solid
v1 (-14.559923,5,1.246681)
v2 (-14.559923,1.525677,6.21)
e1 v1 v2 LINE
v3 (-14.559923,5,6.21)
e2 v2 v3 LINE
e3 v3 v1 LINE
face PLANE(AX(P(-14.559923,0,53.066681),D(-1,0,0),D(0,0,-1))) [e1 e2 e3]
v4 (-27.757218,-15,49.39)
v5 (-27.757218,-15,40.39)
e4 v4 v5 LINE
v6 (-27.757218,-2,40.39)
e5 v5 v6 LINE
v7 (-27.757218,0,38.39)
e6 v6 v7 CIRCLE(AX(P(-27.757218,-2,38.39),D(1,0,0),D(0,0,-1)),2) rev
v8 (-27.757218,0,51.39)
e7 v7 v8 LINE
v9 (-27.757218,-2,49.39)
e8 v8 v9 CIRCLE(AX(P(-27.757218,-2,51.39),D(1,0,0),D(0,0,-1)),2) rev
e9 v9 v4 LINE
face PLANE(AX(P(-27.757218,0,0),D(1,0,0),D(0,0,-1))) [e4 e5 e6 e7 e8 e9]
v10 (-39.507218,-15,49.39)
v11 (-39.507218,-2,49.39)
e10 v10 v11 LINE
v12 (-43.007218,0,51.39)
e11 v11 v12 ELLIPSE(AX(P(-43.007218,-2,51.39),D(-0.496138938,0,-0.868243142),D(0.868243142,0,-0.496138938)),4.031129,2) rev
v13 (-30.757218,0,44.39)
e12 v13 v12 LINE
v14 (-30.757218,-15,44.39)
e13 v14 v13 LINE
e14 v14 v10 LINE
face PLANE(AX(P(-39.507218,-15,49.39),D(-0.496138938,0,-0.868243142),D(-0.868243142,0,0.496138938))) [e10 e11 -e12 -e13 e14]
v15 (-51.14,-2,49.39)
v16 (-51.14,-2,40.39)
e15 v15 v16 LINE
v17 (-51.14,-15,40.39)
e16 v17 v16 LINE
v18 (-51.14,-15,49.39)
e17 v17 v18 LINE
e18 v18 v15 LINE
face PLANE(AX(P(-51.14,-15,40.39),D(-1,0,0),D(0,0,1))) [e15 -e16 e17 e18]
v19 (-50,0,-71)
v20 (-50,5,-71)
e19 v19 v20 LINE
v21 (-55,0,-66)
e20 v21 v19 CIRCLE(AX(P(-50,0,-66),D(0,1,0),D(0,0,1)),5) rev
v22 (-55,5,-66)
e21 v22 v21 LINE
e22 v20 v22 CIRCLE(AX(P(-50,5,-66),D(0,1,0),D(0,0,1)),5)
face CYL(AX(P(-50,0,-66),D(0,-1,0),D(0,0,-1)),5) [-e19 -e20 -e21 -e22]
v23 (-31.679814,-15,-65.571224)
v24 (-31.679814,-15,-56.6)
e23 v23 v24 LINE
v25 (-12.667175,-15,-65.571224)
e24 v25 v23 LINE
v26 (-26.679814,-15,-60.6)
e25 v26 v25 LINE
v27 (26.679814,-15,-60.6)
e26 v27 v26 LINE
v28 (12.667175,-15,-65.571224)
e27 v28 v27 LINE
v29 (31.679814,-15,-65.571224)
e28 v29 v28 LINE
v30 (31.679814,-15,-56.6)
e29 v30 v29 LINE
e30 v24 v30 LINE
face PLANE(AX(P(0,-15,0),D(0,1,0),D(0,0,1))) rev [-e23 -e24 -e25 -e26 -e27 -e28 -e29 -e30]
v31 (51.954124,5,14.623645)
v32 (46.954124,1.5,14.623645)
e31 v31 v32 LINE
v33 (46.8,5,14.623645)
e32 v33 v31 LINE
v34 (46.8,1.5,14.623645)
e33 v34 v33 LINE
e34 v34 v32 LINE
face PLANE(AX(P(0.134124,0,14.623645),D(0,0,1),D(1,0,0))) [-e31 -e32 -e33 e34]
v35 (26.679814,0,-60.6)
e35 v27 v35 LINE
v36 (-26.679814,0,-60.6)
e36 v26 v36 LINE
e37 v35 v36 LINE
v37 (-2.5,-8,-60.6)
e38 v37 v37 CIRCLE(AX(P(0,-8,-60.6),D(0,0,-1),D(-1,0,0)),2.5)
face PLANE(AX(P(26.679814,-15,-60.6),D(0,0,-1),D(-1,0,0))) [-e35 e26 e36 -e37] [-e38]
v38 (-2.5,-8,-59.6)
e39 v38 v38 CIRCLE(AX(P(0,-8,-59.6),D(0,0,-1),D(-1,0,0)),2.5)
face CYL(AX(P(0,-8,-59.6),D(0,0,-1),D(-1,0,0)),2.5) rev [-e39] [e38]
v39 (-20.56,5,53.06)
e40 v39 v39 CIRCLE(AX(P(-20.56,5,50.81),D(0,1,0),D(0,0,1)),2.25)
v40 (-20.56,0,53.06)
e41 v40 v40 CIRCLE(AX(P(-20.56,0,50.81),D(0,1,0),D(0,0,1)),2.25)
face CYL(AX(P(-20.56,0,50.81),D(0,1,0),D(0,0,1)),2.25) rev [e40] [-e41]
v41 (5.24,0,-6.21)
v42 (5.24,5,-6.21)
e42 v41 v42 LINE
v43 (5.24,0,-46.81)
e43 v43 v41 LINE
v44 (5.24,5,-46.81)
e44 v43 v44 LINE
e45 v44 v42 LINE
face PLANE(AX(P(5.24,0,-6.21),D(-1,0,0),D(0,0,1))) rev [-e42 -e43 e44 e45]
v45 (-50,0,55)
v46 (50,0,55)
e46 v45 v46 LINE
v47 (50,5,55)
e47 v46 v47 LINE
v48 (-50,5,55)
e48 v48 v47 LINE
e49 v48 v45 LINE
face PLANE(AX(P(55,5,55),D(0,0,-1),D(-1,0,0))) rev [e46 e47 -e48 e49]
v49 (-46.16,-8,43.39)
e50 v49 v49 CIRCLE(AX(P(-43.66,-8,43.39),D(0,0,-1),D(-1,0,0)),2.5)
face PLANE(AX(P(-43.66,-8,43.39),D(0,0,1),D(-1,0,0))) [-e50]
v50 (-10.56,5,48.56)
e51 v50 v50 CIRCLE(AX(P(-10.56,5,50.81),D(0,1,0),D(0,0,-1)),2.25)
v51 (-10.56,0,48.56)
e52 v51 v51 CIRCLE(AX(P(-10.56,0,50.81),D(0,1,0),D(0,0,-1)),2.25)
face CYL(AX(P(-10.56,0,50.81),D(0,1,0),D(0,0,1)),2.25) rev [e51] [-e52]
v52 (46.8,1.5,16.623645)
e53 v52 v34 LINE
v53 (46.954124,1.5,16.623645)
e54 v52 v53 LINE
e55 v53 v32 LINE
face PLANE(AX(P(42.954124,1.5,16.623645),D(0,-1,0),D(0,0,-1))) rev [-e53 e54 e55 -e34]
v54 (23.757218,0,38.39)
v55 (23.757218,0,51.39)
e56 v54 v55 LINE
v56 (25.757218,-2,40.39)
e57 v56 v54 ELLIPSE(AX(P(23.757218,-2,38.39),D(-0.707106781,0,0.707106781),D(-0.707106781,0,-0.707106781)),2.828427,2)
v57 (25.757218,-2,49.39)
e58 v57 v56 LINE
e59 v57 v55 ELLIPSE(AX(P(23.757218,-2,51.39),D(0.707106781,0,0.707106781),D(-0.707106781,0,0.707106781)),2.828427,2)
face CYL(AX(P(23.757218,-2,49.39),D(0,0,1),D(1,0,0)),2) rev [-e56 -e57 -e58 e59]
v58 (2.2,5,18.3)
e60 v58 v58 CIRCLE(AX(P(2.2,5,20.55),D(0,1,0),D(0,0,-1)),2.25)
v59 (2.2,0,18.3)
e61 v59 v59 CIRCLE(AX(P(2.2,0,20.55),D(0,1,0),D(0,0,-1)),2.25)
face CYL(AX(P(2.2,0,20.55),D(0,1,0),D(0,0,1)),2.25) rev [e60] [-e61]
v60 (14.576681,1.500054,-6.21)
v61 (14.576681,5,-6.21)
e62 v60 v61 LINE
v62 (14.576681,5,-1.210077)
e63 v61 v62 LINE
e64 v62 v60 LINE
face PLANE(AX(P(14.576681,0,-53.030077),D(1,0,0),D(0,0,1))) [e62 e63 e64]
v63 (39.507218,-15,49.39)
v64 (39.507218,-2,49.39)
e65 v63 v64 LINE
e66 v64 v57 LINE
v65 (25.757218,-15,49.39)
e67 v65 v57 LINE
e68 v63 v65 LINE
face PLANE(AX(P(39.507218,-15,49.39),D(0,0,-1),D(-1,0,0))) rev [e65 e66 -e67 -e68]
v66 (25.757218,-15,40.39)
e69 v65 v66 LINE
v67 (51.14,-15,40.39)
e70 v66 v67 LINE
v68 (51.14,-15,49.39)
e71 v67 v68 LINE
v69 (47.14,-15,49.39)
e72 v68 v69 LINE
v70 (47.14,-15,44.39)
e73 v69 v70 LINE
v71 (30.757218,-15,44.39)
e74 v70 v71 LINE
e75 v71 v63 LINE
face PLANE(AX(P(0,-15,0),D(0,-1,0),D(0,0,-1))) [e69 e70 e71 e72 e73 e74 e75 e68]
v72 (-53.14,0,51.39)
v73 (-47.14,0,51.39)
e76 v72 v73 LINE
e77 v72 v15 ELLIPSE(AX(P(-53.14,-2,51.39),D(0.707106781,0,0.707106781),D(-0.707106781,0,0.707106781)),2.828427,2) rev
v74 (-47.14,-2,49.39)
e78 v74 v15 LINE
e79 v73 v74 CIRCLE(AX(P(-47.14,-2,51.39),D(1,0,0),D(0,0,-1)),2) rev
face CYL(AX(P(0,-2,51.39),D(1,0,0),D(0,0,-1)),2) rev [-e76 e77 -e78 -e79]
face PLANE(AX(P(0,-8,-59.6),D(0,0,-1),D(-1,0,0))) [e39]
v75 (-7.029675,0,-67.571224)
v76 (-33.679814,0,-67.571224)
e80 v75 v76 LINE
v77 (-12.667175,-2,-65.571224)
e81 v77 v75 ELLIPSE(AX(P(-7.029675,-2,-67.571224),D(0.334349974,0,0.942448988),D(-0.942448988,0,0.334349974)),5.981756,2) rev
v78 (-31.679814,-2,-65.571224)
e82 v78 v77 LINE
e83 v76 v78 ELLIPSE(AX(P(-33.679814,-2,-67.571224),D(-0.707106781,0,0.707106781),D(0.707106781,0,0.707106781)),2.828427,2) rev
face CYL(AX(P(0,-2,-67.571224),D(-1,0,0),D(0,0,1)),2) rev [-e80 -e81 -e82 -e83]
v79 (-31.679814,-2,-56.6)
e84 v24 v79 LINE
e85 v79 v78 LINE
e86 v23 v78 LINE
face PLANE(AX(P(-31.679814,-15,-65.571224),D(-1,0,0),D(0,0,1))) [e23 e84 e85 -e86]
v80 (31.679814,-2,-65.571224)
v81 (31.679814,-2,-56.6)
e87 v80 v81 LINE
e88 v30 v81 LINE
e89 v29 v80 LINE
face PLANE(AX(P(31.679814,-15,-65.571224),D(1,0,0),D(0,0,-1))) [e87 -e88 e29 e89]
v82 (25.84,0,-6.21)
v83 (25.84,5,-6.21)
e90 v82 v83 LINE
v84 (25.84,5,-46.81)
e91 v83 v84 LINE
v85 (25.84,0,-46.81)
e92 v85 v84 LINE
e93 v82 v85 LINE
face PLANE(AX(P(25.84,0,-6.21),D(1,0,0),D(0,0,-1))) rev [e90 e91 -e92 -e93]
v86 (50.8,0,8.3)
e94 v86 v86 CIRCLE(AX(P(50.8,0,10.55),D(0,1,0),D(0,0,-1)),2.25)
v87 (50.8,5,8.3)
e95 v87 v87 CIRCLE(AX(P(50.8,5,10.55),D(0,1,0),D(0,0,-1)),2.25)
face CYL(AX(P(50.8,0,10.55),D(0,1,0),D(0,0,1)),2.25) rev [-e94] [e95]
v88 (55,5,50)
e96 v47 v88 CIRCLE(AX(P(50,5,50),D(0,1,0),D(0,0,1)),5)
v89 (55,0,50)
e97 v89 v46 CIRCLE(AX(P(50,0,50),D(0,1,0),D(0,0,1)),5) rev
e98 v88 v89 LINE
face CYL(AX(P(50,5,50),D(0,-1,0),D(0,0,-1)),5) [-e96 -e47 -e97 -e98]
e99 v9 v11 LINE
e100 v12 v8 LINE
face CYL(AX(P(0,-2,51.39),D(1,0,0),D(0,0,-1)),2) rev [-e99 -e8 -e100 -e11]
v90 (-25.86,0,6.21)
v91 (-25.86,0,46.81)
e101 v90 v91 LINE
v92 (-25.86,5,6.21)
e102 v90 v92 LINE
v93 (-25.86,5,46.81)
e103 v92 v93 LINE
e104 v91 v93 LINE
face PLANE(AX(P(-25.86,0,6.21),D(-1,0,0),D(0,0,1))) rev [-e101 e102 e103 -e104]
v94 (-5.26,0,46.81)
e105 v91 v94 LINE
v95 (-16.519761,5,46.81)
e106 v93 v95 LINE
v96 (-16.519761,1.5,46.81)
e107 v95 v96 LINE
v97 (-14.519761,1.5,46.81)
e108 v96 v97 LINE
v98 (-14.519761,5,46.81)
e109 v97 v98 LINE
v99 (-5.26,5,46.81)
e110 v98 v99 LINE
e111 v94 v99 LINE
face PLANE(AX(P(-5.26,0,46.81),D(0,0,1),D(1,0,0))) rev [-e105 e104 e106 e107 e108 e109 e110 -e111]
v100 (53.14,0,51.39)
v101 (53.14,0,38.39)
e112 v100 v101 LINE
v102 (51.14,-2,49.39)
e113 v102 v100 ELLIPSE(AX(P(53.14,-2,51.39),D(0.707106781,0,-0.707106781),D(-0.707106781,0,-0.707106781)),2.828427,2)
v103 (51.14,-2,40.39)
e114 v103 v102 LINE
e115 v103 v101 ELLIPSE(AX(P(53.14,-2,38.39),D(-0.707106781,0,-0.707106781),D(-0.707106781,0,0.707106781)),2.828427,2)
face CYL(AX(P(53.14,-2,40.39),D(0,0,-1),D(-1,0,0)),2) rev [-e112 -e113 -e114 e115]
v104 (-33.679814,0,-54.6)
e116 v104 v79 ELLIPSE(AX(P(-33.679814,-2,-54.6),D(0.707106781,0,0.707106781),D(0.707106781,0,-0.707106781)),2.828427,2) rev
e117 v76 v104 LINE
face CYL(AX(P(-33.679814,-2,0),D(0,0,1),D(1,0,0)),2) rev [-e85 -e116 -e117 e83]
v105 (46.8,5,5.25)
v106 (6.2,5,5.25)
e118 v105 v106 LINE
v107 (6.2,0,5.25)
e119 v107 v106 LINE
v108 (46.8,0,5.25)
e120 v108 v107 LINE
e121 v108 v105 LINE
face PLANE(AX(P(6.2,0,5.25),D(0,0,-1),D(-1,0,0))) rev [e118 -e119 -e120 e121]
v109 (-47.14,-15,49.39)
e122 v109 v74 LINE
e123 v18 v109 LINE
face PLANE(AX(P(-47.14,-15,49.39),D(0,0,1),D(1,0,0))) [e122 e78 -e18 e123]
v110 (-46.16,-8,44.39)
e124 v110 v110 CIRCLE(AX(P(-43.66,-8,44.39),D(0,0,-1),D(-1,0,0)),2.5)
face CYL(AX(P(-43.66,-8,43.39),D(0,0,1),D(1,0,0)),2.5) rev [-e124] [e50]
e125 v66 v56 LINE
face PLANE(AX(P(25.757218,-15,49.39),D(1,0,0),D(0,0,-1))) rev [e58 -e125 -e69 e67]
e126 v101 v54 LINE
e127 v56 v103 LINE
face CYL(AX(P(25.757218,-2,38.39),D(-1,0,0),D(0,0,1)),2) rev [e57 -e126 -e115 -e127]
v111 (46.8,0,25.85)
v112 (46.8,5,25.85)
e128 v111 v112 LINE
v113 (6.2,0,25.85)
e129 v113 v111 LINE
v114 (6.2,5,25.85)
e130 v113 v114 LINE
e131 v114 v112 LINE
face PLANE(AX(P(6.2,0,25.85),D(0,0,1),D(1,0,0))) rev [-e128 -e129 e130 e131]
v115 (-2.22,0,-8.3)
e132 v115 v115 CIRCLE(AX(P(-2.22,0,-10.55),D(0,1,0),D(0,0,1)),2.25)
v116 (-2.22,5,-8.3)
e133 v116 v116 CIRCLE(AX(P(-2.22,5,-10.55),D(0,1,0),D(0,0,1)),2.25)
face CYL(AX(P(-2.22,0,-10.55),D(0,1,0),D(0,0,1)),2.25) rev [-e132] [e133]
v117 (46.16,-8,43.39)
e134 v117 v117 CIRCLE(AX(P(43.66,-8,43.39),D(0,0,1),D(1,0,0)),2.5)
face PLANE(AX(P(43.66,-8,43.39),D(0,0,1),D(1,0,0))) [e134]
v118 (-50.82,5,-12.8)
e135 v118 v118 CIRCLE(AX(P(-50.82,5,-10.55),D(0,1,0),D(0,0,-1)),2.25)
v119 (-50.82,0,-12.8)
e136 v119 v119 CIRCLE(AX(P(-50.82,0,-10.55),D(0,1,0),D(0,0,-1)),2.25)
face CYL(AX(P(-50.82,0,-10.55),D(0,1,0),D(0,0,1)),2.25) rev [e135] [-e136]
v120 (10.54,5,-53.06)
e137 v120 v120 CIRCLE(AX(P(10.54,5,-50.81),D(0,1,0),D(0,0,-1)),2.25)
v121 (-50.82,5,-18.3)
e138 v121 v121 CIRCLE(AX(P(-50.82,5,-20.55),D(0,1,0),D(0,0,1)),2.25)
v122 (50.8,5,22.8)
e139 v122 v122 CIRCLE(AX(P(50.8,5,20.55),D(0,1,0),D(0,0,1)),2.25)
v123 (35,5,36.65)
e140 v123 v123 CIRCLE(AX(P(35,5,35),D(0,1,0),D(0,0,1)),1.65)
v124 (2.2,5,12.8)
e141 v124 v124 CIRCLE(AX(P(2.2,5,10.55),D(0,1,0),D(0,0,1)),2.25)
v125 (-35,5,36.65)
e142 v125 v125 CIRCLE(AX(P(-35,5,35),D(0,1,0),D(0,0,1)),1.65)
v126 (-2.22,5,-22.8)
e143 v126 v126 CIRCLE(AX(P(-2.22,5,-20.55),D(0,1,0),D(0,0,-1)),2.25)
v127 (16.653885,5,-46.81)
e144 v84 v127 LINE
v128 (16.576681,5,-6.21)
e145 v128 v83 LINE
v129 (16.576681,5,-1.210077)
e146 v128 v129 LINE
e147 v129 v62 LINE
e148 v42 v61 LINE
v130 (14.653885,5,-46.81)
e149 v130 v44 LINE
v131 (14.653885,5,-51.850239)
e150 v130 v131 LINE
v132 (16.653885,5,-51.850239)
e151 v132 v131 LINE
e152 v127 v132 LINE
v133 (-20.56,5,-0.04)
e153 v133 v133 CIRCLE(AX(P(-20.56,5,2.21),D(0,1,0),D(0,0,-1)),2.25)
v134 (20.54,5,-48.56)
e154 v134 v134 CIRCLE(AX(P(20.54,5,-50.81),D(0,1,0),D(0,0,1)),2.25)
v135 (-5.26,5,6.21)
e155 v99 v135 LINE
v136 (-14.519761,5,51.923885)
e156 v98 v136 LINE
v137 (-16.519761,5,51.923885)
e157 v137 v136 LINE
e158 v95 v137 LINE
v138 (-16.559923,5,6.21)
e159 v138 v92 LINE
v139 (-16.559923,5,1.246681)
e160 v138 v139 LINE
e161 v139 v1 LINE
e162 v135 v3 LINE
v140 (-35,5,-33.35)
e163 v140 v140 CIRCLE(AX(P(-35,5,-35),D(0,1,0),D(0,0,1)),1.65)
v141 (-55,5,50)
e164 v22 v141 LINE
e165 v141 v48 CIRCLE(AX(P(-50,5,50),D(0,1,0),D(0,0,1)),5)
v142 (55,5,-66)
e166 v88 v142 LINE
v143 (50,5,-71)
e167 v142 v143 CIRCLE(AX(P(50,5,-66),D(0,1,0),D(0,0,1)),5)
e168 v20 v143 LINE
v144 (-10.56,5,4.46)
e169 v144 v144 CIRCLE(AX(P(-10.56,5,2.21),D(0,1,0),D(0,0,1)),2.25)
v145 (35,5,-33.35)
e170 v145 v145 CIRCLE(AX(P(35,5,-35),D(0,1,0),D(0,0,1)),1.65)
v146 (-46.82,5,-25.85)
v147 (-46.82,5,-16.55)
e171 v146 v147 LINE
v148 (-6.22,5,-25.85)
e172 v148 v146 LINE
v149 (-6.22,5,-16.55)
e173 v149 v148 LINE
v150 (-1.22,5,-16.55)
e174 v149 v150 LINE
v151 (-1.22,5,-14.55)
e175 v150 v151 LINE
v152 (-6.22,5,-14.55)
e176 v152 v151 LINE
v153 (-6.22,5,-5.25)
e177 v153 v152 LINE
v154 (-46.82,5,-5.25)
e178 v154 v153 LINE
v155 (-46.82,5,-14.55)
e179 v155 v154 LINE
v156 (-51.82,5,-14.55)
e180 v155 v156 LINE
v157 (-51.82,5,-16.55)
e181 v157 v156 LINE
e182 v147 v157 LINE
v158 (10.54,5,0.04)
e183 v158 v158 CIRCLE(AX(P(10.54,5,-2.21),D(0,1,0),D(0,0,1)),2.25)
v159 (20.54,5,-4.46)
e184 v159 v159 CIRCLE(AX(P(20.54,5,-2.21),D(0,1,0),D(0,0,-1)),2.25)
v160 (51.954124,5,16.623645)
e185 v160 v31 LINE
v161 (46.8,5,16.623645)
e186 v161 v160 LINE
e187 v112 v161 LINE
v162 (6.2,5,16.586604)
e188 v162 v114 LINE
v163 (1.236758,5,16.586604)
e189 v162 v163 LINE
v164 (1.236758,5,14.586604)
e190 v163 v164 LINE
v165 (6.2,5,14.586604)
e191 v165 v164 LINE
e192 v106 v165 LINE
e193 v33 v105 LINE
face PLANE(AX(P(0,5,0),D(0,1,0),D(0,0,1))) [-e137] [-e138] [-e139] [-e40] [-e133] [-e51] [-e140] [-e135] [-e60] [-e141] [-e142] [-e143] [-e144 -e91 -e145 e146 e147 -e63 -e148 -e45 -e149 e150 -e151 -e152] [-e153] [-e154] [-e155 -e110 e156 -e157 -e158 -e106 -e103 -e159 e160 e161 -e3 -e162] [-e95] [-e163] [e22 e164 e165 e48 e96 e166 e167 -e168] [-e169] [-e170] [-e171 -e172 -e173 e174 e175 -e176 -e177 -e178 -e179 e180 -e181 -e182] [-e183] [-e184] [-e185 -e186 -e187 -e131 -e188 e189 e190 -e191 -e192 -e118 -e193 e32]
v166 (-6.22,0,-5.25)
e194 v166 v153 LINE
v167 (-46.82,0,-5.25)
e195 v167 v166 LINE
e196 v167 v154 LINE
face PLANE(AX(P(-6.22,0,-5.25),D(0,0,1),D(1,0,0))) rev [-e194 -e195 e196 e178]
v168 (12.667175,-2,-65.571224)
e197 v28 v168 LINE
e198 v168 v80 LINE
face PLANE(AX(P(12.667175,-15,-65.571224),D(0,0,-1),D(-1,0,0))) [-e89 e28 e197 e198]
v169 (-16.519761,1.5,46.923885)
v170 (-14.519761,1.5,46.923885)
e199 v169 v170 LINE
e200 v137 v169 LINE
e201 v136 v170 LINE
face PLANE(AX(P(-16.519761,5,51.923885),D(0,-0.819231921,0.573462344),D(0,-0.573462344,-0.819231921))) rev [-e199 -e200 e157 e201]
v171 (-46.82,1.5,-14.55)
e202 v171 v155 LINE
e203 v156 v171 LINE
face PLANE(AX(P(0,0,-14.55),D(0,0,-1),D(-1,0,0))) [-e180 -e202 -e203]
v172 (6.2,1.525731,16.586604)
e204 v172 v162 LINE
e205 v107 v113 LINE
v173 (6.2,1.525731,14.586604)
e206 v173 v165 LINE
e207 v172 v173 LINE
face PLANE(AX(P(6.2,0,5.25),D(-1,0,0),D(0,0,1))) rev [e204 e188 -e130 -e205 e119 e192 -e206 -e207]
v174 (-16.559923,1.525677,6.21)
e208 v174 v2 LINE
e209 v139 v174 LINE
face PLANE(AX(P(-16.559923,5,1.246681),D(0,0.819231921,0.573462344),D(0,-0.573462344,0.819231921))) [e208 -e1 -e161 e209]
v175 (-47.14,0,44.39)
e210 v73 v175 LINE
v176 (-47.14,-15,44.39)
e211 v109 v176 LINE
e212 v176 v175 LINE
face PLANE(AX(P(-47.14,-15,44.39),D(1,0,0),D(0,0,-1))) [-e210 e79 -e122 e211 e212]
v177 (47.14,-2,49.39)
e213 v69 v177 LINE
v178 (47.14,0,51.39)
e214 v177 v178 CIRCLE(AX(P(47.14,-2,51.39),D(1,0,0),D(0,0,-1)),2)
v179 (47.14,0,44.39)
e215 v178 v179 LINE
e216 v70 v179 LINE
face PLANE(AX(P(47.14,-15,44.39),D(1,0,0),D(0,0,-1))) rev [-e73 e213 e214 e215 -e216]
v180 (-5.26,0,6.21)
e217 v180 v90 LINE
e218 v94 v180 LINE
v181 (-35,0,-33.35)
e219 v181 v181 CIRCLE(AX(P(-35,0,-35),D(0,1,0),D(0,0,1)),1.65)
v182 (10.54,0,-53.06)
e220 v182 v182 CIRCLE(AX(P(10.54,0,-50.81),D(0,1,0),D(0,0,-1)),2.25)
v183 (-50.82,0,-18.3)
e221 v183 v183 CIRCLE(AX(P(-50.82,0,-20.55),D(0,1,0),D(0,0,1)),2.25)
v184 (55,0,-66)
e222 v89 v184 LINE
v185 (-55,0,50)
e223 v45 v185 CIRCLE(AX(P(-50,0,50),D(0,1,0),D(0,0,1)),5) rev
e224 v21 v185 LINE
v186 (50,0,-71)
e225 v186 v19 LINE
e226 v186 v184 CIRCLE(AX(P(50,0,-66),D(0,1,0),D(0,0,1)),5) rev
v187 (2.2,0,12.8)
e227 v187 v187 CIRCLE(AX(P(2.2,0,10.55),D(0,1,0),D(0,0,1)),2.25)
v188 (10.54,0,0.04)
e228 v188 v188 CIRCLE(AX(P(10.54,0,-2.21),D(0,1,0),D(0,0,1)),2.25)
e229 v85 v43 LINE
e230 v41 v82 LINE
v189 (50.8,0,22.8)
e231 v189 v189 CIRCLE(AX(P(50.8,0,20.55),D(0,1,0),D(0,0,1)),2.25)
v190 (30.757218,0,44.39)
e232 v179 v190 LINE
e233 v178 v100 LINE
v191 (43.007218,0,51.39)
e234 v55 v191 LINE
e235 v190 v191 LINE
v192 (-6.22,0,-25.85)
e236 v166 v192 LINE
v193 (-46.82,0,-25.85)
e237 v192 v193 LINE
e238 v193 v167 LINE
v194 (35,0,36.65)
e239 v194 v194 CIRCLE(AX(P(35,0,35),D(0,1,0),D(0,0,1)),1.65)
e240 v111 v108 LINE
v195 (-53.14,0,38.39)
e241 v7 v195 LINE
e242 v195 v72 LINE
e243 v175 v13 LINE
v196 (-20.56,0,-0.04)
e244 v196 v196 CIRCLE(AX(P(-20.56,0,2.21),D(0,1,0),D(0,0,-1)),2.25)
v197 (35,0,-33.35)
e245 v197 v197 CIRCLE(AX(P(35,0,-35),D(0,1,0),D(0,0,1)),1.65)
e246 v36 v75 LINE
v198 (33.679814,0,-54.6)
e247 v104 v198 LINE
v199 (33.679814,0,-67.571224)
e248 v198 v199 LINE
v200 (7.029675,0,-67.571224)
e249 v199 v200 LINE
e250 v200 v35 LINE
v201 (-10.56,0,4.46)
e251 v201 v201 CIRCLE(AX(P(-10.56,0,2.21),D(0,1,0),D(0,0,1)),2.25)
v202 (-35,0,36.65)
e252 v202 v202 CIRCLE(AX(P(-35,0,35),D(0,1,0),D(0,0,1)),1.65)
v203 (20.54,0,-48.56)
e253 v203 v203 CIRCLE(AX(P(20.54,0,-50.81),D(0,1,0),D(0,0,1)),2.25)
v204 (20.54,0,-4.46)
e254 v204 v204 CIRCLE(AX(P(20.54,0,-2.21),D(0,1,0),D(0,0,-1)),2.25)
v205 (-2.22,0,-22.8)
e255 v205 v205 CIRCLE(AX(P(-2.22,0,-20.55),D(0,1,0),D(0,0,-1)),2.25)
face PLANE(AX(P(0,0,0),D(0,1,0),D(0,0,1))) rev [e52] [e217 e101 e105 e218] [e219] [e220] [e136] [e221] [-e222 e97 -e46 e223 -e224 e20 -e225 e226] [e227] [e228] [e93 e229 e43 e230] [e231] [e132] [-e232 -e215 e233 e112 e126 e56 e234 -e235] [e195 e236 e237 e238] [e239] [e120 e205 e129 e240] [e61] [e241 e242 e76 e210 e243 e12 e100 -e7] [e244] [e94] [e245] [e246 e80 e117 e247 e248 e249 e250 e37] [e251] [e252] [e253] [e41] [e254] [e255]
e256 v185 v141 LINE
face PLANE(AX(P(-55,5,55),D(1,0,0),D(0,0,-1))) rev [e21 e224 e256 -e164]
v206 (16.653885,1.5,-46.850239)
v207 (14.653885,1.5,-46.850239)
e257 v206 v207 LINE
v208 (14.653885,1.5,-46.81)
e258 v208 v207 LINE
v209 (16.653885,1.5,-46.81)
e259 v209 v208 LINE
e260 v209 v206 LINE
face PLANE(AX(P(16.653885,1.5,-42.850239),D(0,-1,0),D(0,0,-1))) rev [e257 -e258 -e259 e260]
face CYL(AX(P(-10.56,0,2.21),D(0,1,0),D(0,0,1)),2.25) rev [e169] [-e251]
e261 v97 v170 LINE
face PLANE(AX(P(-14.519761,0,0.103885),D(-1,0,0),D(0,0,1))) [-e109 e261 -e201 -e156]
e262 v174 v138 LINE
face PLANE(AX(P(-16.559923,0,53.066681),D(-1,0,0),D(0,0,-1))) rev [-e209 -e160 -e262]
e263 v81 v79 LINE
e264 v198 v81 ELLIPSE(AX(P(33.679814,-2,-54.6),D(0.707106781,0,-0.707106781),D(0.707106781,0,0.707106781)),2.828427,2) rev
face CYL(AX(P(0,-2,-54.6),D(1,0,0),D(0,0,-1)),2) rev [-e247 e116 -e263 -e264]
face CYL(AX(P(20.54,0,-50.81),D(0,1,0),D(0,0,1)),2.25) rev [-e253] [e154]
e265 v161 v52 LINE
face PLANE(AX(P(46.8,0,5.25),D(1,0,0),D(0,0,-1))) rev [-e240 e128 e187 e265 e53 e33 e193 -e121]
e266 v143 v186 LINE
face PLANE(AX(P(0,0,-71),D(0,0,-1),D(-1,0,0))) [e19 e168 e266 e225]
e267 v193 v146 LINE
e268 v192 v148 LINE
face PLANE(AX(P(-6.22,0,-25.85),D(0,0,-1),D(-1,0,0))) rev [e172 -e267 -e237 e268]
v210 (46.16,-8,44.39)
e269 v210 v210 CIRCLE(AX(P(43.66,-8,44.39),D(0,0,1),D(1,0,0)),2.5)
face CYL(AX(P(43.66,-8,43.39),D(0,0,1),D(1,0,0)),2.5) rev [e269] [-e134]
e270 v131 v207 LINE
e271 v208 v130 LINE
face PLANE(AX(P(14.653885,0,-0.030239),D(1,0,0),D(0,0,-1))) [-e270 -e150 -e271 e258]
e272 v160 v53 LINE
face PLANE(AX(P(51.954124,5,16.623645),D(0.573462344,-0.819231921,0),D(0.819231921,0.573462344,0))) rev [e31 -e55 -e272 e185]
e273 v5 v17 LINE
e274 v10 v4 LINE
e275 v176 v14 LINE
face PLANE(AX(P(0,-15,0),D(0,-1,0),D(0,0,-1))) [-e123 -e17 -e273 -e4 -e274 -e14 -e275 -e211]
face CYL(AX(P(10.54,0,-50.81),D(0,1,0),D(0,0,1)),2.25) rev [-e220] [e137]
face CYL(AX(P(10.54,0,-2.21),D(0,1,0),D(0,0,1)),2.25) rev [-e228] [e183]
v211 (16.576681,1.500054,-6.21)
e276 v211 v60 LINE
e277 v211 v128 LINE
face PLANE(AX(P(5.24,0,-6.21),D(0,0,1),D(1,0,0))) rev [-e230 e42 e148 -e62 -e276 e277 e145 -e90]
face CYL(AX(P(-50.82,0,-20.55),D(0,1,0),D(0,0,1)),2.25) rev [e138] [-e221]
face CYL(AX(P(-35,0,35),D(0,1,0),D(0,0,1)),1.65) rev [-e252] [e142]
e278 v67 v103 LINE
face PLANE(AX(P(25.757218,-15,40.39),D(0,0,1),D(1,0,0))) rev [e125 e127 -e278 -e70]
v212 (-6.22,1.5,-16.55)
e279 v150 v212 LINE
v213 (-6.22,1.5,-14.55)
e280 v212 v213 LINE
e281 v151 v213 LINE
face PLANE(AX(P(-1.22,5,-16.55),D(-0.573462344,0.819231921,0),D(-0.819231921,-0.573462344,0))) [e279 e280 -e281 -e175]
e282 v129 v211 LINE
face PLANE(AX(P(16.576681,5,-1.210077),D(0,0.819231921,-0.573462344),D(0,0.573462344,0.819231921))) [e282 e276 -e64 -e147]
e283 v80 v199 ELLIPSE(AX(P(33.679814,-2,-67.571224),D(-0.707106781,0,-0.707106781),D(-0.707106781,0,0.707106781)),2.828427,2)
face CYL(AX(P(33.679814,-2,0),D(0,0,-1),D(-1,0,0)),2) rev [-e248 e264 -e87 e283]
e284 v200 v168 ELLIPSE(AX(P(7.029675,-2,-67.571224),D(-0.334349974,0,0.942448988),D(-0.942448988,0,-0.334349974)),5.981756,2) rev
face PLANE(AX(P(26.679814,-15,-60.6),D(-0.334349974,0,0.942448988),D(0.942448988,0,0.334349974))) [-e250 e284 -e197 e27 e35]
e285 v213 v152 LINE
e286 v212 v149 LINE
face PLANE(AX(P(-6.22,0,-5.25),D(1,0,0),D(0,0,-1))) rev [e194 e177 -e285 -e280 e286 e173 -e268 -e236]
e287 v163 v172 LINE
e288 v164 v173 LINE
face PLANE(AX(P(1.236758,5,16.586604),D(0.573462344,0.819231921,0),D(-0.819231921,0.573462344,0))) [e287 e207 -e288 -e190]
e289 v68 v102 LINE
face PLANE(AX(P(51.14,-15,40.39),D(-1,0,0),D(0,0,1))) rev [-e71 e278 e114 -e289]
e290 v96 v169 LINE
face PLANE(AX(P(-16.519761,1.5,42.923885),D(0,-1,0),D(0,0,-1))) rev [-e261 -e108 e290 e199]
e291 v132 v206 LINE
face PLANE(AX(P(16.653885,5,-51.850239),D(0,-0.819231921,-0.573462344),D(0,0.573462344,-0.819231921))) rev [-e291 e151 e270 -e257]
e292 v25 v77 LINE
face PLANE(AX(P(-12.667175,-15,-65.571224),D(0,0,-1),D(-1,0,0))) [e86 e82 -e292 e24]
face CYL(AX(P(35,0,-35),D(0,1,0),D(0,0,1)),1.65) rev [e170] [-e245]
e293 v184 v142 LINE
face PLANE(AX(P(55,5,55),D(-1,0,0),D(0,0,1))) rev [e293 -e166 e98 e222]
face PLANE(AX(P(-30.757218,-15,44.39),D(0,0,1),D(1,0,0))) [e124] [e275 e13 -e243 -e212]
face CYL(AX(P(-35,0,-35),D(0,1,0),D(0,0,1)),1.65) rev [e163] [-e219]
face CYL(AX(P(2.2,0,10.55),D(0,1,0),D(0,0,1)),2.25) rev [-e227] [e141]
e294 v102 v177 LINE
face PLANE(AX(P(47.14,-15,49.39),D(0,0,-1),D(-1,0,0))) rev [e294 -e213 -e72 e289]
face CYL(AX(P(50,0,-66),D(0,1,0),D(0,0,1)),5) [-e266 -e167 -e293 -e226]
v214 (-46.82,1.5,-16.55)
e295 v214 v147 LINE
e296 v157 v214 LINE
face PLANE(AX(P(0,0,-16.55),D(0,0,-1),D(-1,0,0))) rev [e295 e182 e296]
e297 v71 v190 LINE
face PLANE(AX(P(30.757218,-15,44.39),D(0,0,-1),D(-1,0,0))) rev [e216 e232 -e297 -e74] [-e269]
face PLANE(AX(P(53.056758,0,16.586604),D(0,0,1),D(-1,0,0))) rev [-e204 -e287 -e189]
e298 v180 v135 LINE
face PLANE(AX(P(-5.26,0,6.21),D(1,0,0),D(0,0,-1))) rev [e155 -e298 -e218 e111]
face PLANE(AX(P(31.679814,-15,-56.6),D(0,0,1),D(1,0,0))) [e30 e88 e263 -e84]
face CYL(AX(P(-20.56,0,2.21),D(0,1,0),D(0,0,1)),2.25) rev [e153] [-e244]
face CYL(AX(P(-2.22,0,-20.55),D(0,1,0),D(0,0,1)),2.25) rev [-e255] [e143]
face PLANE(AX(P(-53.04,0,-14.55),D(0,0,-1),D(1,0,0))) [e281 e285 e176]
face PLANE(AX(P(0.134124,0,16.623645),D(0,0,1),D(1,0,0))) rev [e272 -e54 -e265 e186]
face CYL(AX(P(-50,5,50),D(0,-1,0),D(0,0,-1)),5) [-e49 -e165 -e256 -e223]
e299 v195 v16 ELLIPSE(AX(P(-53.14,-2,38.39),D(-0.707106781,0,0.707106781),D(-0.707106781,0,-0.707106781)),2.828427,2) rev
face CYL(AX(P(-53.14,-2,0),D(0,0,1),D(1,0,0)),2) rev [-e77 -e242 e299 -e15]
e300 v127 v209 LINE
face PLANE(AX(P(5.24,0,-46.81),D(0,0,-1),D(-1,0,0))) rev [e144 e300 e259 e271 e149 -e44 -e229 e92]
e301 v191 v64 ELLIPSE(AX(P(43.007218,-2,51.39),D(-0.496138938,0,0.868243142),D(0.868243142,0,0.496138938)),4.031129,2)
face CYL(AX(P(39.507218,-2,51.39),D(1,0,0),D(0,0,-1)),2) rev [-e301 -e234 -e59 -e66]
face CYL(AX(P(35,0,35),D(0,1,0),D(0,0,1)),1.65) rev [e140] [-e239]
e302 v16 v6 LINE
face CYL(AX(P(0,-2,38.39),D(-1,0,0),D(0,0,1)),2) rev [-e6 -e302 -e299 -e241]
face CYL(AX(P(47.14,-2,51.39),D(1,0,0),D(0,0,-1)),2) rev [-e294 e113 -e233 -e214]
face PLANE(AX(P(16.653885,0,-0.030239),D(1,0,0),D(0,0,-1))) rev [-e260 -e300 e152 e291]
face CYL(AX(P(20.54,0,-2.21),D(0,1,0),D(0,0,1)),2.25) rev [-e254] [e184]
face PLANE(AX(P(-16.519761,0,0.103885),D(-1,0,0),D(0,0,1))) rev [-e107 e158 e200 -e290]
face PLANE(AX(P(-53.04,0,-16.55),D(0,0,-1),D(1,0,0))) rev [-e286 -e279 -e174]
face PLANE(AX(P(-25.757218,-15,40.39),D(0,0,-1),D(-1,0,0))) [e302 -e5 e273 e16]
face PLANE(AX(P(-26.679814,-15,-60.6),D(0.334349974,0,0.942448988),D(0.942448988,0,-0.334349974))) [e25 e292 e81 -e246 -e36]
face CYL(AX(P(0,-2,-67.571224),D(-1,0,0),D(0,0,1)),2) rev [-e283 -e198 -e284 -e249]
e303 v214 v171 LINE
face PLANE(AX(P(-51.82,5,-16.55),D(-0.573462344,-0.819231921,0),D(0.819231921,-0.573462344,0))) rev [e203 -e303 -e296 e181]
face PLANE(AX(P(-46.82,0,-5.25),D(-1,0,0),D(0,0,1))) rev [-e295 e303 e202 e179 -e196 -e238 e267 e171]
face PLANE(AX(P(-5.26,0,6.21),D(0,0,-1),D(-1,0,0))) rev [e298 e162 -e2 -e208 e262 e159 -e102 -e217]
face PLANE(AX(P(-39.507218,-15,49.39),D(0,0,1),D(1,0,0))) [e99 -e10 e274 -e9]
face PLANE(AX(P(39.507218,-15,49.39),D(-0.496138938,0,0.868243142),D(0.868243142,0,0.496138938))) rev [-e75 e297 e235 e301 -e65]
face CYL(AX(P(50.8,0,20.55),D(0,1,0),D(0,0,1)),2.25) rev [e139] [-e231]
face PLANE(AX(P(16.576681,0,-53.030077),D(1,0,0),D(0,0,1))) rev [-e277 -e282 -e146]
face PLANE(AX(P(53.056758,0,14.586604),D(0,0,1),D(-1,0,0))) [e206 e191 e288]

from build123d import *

# Parameters (mm, degrees)
SKETCH_1_W                 = 110
SKETCH_1_H                 = 110
EXTRUDE_1_DEPTH            = 5
SKETCH_2_R                 = 2.25
SKETCH_2_W                 = 40.6
SKETCH_2_H                 = 20.6
SKETCH_2_W_2               = 20.6
SKETCH_2_H_2               = 40.6
CUT_EXTRUDE_1_DEPTH        = 5
SKETCH_4_R                 = 1.65
CUT_EXTRUDE_2_DEPTH        = 5
CUT_EXTRUDE_3_DEPTH        = 1
PATTERN_START              = -16.519760508
PATTERN_CIRCULAR_3_DEPTH   = 1.959837541
PATTERN_START_2            = 14.653884875
PATTERN_CIRCULAR_3_2_DEPTH = 1.922796081
PATTERN_START_3            = 16.576680956
PATTERN_CIRCULAR_3_3_DEPTH = 0.077203919
PATTERN_START_4            = 14.576680956
PATTERN_CIRCULAR_3_4_DEPTH = 0.077203919
PATTERN_START_5            = -14.559922967
PATTERN_CIRCULAR_3_5_DEPTH = 0.040162459
PATTERN_START_6            = -16.559922967
PATTERN_CIRCULAR_3_6_DEPTH = 0.040162459
PATTERN_START_7            = 14.623645383
PATTERN_CIRCULAR_3_7_DEPTH = 1.96295854
PATTERN_START_8            = 16.586603923
PATTERN_CIRCULAR_3_8_DEPTH = 0.03704146
PATTERN_START_9            = 14.586603923
PATTERN_CIRCULAR_3_9_DEPTH = 0.03704146
SKETCH_9_W                 = 110
SKETCH_9_H                 = 5
EXTRUDE_4_DEPTH            = 20
EXTRUDE_5_DEPTH            = 20
EXTRUDE_6_DEPTH            = 15
CUT_EXTRUDE_4_DEPTH        = 2
FILLET_1_R                 = 2
FILLET_2_R                 = 2
FILLET_3_R                 = 2
SKETCH_13_R                = 2.5
CUT_EXTRUDE_5_DEPTH        = 1
SKETCH_14_R                = 2.5
CUT_EXTRUDE_6_DEPTH        = 1
SKETCH_15_W                = 110
SKETCH_15_H                = 5
CUT_EXTRUDE_7_DEPTH        = 4
FILLET_4_R                 = 5
SKETCH_17_W                = 2
SKETCH_17_H                = 3.5
CUT_EXTRUDE_10_DEPTH       = 4
SKETCH_18_W                = 2
SKETCH_18_H                = 3.5
CUT_EXTRUDE_11_DEPTH       = 4
SKETCH_19_W                = 2
SKETCH_19_H                = 3.5
CUT_EXTRUDE_12_DEPTH       = 4


# Read off the part's stored shape, not the designer's step: 阵列(圆周)3
with BuildPart() as part:
    # 草图1 → 凸台-拉伸1 (new body)
    with BuildSketch(Plane(origin=(0, 0, 0), x_dir=(1, 0, 0), z_dir=(0, 1, 0))):
        Rectangle(SKETCH_1_W, SKETCH_1_H)
    extrude(amount=EXTRUDE_1_DEPTH)

    # 草图2 → 切除-拉伸1 (cut)
    with BuildSketch(Plane(origin=(0, 5, 0), x_dir=(1, 0, 0), z_dir=(0, 1, 0))):
        with Locations(Location((2.2, -10.55, 0), (0, 0, 270))):
            Circle(SKETCH_2_R)
        with Locations(Location((2.2, -20.55, 0), (0, 0, 90))):
            Circle(SKETCH_2_R)
        with Locations(Location((50.8, -20.55, 0), (0, 0, 270))):
            Circle(SKETCH_2_R)
        with Locations(Location((50.8, -10.55, 0), (0, 0, 90))):
            Circle(SKETCH_2_R)
        with Locations(Location((-10.56, -50.81, 0), (0, 0, 90))):
            Circle(SKETCH_2_R)
        with Locations(Location((-20.56, -50.81, 0), (0, 0, 270))):
            Circle(SKETCH_2_R)
        with Locations(Location((-20.56, -2.21, 0), (0, 0, 90))):
            Circle(SKETCH_2_R)
        with Locations(Location((-10.56, -2.21, 0), (0, 0, 270))):
            Circle(SKETCH_2_R)
        with Locations(Location((-50.82, 10.55, 0), (0, 0, 90))):
            Circle(SKETCH_2_R)
        with Locations(Location((-50.82, 20.55, 0), (0, 0, 270))):
            Circle(SKETCH_2_R)
        with Locations(Location((-2.22, 20.55, 0), (0, 0, 90))):
            Circle(SKETCH_2_R)
        with Locations(Location((-2.22, 10.55, 0), (0, 0, 270))):
            Circle(SKETCH_2_R)
        with Locations(Location((10.54, 50.81, 0), (0, 0, 90))):
            Circle(SKETCH_2_R)
        with Locations(Location((20.54, 50.81, 0), (0, 0, 270))):
            Circle(SKETCH_2_R)
        with Locations(Location((20.54, 2.21, 0), (0, 0, 90))):
            Circle(SKETCH_2_R)
        with Locations(Location((10.54, 2.21, 0), (0, 0, 270))):
            Circle(SKETCH_2_R)
        with Locations((-26.52, 15.55)):
            Rectangle(SKETCH_2_W, SKETCH_2_H)
        with Locations((-15.56, -26.51)):
            Rectangle(SKETCH_2_W_2, SKETCH_2_H_2)
        with Locations((26.5, -15.55)):
            Rectangle(SKETCH_2_W, SKETCH_2_H)
        with Locations((15.54, 26.51)):
            Rectangle(SKETCH_2_W_2, SKETCH_2_H_2)
    extrude(amount=-CUT_EXTRUDE_1_DEPTH, mode=Mode.SUBTRACT)

    # 草图4 → 切除-拉伸2 (cut)
    with BuildSketch(Plane(origin=(0, 5, 0), x_dir=(1, 0, 0), z_dir=(0, 1, 0))):
        with Locations(Location((-35, 35, 0), (0, 0, 270))):
            Circle(SKETCH_4_R)
        with Locations(Location((35, 35, 0), (0, 0, 270))):
            Circle(SKETCH_4_R)
        with Locations(Location((35, -35, 0), (0, 0, 270))):
            Circle(SKETCH_4_R)
        with Locations(Location((-35, -35, 0), (0, 0, 270))):
            Circle(SKETCH_4_R)
    extrude(amount=-CUT_EXTRUDE_2_DEPTH, mode=Mode.SUBTRACT)

    # 草图6 → 切除-拉伸3 (cut, symmetric)
    with BuildSketch(Plane.XY.offset(-15.55)):
        Polygon((-46.82, 5), (-51.82, 5), (-46.82, 1.5), align=None)
    cut_extrude_3 = extrude(amount=CUT_EXTRUDE_3_DEPTH, both=True, mode=Mode.SUBTRACT)

    # 镜向1: 切除-拉伸3 across plane
    add(cut_extrude_3.mirror(Plane(origin=(-26.52, 0, 0), x_dir=(0, 0, 1), z_dir=(1, 0, 0))), mode=Mode.SUBTRACT)

    # 阵列(圆周)3 outline → 阵列(圆周)3 (cut)
    with BuildSketch(Plane.YZ.offset(PATTERN_START)):
        Polygon((1.5, 46.923884875), (5, 46.923884875), (5, 51.923884875), align=None)
        Polygon((1.525676669, 6.21), (5, 1.246680956), (5, 6.21), align=None)
    extrude(amount=PATTERN_CIRCULAR_3_DEPTH, mode=Mode.SUBTRACT)

    # Pattern Circular 3 2 outline → Pattern Circular 3 2 (cut)
    with BuildSketch(Plane.YZ.offset(PATTERN_START_2)):
        Polygon((5, -51.850239492), (5, -46.850239492), (1.5, -46.850239492), align=None)
        Polygon((1.500053923, -6.21), (5, -6.21), (5, -1.210077033), align=None)
    extrude(amount=PATTERN_CIRCULAR_3_2_DEPTH, mode=Mode.SUBTRACT)

    # Pattern Circular 3 3 outline → Pattern Circular 3 3 (cut)
    with BuildSketch(Plane.YZ.offset(PATTERN_START_3)):
        Polygon((5, -51.850239492), (5, -46.850239492), (1.5, -46.850239492), align=None)
    extrude(amount=PATTERN_CIRCULAR_3_3_DEPTH, mode=Mode.SUBTRACT)

    # Pattern Circular 3 4 outline → Pattern Circular 3 4 (cut)
    with BuildSketch(Plane.YZ.offset(PATTERN_START_4)):
        Polygon((1.500053923, -6.21), (5, -6.21), (5, -1.210077033), align=None)
    extrude(amount=PATTERN_CIRCULAR_3_4_DEPTH, mode=Mode.SUBTRACT)

    # Pattern Circular 3 5 outline → Pattern Circular 3 5 (cut)
    with BuildSketch(Plane.YZ.offset(PATTERN_START_5)):
        Polygon((1.5, 46.923884875), (5, 46.923884875), (5, 51.923884875), align=None)
    extrude(amount=PATTERN_CIRCULAR_3_5_DEPTH, mode=Mode.SUBTRACT)

    # Pattern Circular 3 6 outline → Pattern Circular 3 6 (cut)
    with BuildSketch(Plane.YZ.offset(PATTERN_START_6)):
        Polygon((1.525676669, 6.21), (5, 1.246680956), (5, 6.21), align=None)
    extrude(amount=PATTERN_CIRCULAR_3_6_DEPTH, mode=Mode.SUBTRACT)

    # Pattern Circular 3 7 outline → Pattern Circular 3 7 (cut)
    with BuildSketch(Plane.XY.offset(PATTERN_START_7)):
        Polygon((51.954124367, 5), (46.954124367, 5), (46.954124367, 1.5), align=None)
        Polygon((6.2, 1.525730592), (6.2, 5), (1.236757989, 5), align=None)
    extrude(amount=PATTERN_CIRCULAR_3_7_DEPTH, mode=Mode.SUBTRACT)

    # Pattern Circular 3 8 outline → Pattern Circular 3 8 (cut)
    with BuildSketch(Plane.XY.offset(PATTERN_START_8)):
        Polygon((51.954124367, 5), (46.954124367, 5), (46.954124367, 1.5), align=None)
    extrude(amount=PATTERN_CIRCULAR_3_8_DEPTH, mode=Mode.SUBTRACT)

    # Pattern Circular 3 9 outline → Pattern Circular 3 9 (cut)
    with BuildSketch(Plane.XY.offset(PATTERN_START_9)):
        Polygon((6.2, 1.525730592), (6.2, 5), (1.236757989, 5), align=None)
    extrude(amount=PATTERN_CIRCULAR_3_9_DEPTH, mode=Mode.SUBTRACT)

    # 草图9 → 凸台-拉伸4 (add)
    with BuildSketch(Plane(origin=(0, 0, -55), x_dir=(-1, 0, 0), z_dir=(0, 0, -1))):
        with Locations((0, 2.5)):
            Rectangle(SKETCH_9_W, SKETCH_9_H)
    extrude(amount=EXTRUDE_4_DEPTH)

    # 草图10 → 凸台-拉伸5 (add)
    with BuildSketch(Plane(origin=(0, 5, 0), x_dir=(1, 0, 0), z_dir=(0, 1, 0))):
        Polygon((26.679814029, 60.6), (12.667174987, 65.571224494), (31.679814029, 65.571224494), (31.679814029, 56.6), (-31.679814029, 56.6), (-31.679814029, 65.571224494), (-12.667174987, 65.571224494), (-26.679814029, 60.6), align=None)
    extrude(amount=-EXTRUDE_5_DEPTH)

    # 草图11 → 凸台-拉伸6 (add)
    with BuildSketch(Plane.XZ):
        Polygon((47.14, 44.39), (47.14, 49.39), (51.14, 49.39), (51.14, 40.39), (25.757217781, 40.39), (25.757217781, 49.39), (39.507217781, 49.39), (30.757217781, 44.39), align=None)
    extrude_6 = extrude(amount=EXTRUDE_6_DEPTH)

    # 镜向2: 凸台-拉伸6 across plane
    add(extrude_6.mirror(Plane(origin=(0, 0, 0), x_dir=(0, 0, 1), z_dir=(1, 0, 0))))

    # 草图12 → 切除-拉伸4 (cut)
    with BuildSketch(Plane(origin=(-25.757217781, 0, 0), x_dir=(0, 0, -1), z_dir=(1, 0, 0))):
        Polygon((-46.81, 0), (-49.39, 0), (-49.39, -15), (-40.39, -15), (-40.39, 0), align=None)
    extrude(amount=-CUT_EXTRUDE_4_DEPTH, mode=Mode.SUBTRACT)

    # 圆角1
    fillet_1_edges = [part.edges().sort_by_distance(p)[0] for p in [
        (-51.14, 0, 44.89),
        (-49.14, 0, 49.39),
        (-33.632217781, 0, 49.39),
        (-39.448608891, 0, 40.39),
    ]]
    fillet(fillet_1_edges, radius=FILLET_1_R)

    # 圆角2
    fillet_2_edges = [part.edges().sort_by_distance(p)[0] for p in [
        (32.632217781, 0, 49.39),
        (25.757217781, 0, 44.89),
        (38.448608891, 0, 40.39),
        (51.14, 0, 44.89),
        (49.14, 0, 49.39),
    ]]
    fillet(fillet_2_edges, radius=FILLET_2_R)

    # 圆角3
    fillet_3_edges = [part.edges().sort_by_distance(p)[0] for p in [
        (-22.173494508, 0, -65.571224494),
        (-31.679814029, 0, -61.085612247),
        (0, 0, -56.6),
        (31.679814029, 0, -61.085612247),
        (22.173494508, 0, -65.571224494),
    ]]
    fillet(fillet_3_edges, radius=FILLET_3_R)

    # 草图13 → 切除-拉伸5 (cut)
    with BuildSketch(Plane(origin=(0, 0, -60.6), x_dir=(-1, 0, 0), z_dir=(0, 0, -1))):
        with Locations((0, -8)):
            Circle(SKETCH_13_R)
    extrude(amount=-CUT_EXTRUDE_5_DEPTH, mode=Mode.SUBTRACT)

    # 草图14 → 切除-拉伸6 (cut)
    with BuildSketch(Plane.XY.offset(44.39)):
        with Locations((43.66, -8)):
            Circle(SKETCH_14_R)
    cut_extrude_6 = extrude(amount=-CUT_EXTRUDE_6_DEPTH, mode=Mode.SUBTRACT)

    # 镜向4: 切除-拉伸6 across plane
    add(cut_extrude_6.mirror(Plane(origin=(0, 0, 0), x_dir=(0, 0, 1), z_dir=(1, 0, 0))), mode=Mode.SUBTRACT)

    # 草图15 → 切除-拉伸7 (cut)
    with BuildSketch(Plane(origin=(0, 0, -75), x_dir=(-1, 0, 0), z_dir=(0, 0, -1))):
        with Locations((0, 2.5)):
            Rectangle(SKETCH_15_W, SKETCH_15_H)
    extrude(amount=-CUT_EXTRUDE_7_DEPTH, mode=Mode.SUBTRACT)

    # 圆角4
    fillet_4_edges = [part.edges().sort_by_distance(p)[0] for p in [
        (-55, 2.5, -71),
        (55, 2.5, -71),
        (55, 2.5, 55),
        (-55, 2.5, 55),
    ]]
    fillet(fillet_4_edges, radius=FILLET_4_R)

    # 草图17 → 切除-拉伸10 (cut)
    with BuildSketch(Plane(origin=(0, 0, -46.850239492), x_dir=(-1, 0, 0), z_dir=(0, 0, -1))):
        with Locations((-15.653884875, 3.25)):
            Rectangle(SKETCH_17_W, SKETCH_17_H)
    extrude(amount=-CUT_EXTRUDE_10_DEPTH, mode=Mode.SUBTRACT)

    # 草图18 → 切除-拉伸11 (cut)
    with BuildSketch(Plane.XY.offset(46.923884875)):
        with Locations((-15.519760508, 3.25)):
            Rectangle(SKETCH_18_W, SKETCH_18_H)
    extrude(amount=-CUT_EXTRUDE_11_DEPTH, mode=Mode.SUBTRACT)

    # 草图19 → 切除-拉伸12 (cut)
    with BuildSketch(Plane(origin=(46.954124367, 0, 0), x_dir=(0, 0, -1), z_dir=(1, 0, 0))):
        with Locations((-15.623645383, 3.25)):
            Rectangle(SKETCH_19_W, SKETCH_19_H)
    extrude(amount=-CUT_EXTRUDE_12_DEPTH, mode=Mode.SUBTRACT)


solid = part.part
